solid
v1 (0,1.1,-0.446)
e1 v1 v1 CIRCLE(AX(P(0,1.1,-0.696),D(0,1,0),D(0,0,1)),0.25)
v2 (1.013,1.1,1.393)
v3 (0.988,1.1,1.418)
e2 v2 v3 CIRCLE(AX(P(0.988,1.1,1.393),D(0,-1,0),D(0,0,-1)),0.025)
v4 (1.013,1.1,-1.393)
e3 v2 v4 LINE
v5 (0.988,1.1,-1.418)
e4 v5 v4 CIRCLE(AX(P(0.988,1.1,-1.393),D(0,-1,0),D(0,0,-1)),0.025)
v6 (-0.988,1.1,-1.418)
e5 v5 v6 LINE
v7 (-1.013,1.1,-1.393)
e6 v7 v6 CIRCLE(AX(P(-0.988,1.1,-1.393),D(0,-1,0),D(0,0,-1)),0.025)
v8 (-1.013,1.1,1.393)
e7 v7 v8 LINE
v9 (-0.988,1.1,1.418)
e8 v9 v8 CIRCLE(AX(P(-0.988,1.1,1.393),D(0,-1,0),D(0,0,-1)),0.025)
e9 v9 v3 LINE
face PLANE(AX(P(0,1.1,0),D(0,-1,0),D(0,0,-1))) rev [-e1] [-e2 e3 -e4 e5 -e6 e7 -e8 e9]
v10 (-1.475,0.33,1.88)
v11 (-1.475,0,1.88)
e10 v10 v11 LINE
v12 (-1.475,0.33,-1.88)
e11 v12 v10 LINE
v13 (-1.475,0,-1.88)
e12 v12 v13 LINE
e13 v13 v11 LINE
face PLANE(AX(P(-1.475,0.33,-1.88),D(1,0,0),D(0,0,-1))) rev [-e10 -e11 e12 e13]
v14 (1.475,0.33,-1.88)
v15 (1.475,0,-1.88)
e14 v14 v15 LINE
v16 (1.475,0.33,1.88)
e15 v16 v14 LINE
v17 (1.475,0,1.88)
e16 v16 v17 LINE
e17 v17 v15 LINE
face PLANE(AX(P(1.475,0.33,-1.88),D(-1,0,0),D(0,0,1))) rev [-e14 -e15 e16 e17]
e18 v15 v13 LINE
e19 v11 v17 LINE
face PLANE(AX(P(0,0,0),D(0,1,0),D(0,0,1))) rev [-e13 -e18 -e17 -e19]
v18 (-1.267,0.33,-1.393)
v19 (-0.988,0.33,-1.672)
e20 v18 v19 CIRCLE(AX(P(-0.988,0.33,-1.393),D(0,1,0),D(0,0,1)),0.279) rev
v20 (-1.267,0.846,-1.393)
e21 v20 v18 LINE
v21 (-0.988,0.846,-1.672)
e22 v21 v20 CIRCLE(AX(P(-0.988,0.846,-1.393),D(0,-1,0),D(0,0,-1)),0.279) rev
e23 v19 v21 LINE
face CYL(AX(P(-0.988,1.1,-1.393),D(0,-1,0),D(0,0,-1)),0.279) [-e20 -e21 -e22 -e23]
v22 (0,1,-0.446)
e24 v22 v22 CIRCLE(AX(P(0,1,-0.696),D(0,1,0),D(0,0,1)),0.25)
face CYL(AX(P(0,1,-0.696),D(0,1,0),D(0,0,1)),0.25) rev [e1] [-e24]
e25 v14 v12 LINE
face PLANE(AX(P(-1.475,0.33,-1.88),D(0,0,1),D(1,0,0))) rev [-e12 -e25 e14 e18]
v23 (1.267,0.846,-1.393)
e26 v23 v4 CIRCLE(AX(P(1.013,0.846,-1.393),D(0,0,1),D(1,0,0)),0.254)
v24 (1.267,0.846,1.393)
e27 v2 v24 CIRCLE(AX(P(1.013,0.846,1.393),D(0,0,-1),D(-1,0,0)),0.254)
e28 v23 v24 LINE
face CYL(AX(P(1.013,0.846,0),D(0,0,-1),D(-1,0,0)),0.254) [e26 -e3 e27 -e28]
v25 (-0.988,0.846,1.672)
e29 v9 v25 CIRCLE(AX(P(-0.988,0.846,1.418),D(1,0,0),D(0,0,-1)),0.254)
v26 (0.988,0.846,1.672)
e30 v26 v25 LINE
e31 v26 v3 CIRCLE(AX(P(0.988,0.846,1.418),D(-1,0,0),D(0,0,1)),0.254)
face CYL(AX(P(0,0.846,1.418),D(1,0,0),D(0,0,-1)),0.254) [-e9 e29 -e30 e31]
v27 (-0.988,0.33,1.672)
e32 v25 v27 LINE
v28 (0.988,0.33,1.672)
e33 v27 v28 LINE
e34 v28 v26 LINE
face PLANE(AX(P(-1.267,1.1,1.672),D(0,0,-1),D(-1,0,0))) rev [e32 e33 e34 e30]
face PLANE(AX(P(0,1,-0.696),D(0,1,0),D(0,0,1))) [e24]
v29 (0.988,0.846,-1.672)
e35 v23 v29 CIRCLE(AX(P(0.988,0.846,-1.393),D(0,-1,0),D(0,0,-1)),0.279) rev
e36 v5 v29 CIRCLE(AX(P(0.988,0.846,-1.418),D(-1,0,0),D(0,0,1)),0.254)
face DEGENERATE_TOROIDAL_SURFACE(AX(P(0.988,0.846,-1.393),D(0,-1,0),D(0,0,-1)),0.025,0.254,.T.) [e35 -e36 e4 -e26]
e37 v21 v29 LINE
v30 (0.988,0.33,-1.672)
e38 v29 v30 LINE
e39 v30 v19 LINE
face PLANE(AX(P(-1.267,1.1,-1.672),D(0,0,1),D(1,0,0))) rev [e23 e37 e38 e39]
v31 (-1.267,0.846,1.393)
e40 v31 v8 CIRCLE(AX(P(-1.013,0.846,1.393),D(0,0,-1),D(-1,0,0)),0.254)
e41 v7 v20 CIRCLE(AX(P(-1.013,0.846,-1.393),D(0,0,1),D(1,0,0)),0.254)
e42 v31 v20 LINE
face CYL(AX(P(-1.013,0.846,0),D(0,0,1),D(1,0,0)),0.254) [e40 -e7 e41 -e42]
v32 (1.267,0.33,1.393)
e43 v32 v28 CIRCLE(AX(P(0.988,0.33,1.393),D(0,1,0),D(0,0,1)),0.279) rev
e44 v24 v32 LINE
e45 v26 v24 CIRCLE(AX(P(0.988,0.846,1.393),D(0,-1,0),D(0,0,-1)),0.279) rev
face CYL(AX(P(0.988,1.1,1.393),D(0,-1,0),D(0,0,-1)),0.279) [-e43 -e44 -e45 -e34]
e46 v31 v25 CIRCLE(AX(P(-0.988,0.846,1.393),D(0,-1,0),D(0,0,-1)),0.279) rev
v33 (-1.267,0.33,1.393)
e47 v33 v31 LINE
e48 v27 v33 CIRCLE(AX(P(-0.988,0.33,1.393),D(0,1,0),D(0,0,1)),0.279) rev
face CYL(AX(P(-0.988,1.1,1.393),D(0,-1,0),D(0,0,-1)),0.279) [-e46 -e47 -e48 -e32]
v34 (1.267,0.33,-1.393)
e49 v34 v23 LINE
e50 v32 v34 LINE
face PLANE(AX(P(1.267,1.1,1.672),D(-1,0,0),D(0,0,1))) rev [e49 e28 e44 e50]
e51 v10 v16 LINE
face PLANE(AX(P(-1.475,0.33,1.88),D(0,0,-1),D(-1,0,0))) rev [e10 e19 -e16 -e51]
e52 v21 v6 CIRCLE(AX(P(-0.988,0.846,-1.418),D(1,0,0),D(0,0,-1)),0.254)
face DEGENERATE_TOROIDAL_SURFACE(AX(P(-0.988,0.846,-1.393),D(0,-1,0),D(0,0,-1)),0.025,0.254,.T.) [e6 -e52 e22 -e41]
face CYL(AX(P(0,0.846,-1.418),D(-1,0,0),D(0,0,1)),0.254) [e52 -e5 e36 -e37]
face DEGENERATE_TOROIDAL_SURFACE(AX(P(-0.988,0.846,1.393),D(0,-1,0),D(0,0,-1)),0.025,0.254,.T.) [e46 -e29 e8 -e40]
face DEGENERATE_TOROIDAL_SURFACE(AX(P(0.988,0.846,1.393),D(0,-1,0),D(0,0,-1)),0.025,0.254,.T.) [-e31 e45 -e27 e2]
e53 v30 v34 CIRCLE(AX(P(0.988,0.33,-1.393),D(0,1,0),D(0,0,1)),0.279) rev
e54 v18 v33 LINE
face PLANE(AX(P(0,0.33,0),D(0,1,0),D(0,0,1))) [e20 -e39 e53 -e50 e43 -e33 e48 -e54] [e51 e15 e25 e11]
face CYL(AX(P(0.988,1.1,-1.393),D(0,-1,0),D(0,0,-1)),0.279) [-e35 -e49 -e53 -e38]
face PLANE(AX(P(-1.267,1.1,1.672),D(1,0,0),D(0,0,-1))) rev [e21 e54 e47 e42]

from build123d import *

# Parameters (mm, degrees)
SKETCH1_W           = 2.95
SKETCH1_H           = 3.76
BOSS_EXTRUDE1_DEPTH = 0.33
SKETCH2_W           = 2.534
SKETCH2_H           = 3.344
BOSS_EXTRUDE2_DEPTH = 0.77
FILLET1_R           = 0.254
FILLET2_R           = 0.279
SKETCH3_R           = 0.25
CUT_EXTRUDE1_DEPTH  = 0.1


with BuildPart() as part:
    # Sketch1 → Boss-Extrude1 (new body)
    with BuildSketch(Plane(origin=(0, 0, 0), x_dir=(1, 0, 0), z_dir=(0, 1, 0))):
        Rectangle(SKETCH1_W, SKETCH1_H)
    extrude(amount=BOSS_EXTRUDE1_DEPTH)

    # Sketch2 → Boss-Extrude2 (add)
    with BuildSketch(Plane(origin=(0, 0.33, 0), x_dir=(1, 0, 0), z_dir=(0, 1, 0))):
        Rectangle(SKETCH2_W, SKETCH2_H)
    extrude(amount=BOSS_EXTRUDE2_DEPTH)

    # Fillet1
    fillet1_edges = [part.edges().sort_by_distance(p)[0] for p in [
        (1.267, 1.1, 0),
        (0, 1.1, -1.672),
        (-1.267, 1.1, 0),
        (0, 1.1, 1.672),
    ]]
    fillet(fillet1_edges, radius=FILLET1_R)

    # Fillet2
    # the kernel refuses this fillet: 0.279 mm, written as the material it takes off along each edge
    with BuildSketch(Plane(origin=(-0.988, 1.1, -1.393), x_dir=(0, 0, -1), z_dir=(1, 0, 0))) as fillet2_piece_1:
        with BuildLine():
            CenterArc((0.025, -0.254), 0.254, 0, 90)
            Line((0.279, -0.254), (0.279, 0))
            Line((0.279, 0), (0.025, 0))
        make_face()
    revolve(axis=Axis((-0.988, 1.1, -1.393), (0, 1, 0)), revolution_arc=90, mode=Mode.SUBTRACT)
    with BuildSketch(Plane(origin=(0.988, 1.1, -1.393), x_dir=(1, 0, 0), z_dir=(0, 0, 1))) as fillet2_piece_2:
        with BuildLine():
            CenterArc((0.025, -0.254), 0.254, 0, 90)
            Line((0.279, -0.254), (0.279, 0))
            Line((0.279, 0), (0.025, 0))
        make_face()
    revolve(axis=Axis((0.988, 1.1, -1.393), (0, 1, 0)), revolution_arc=90, mode=Mode.SUBTRACT)
    with BuildSketch(Plane(origin=(-0.988, 1.1, 1.393), x_dir=(-1, 0, 0), z_dir=(0, 0, -1))) as fillet2_piece_3:
        with BuildLine():
            CenterArc((0.025, -0.254), 0.254, 0, 90)
            Line((0.279, -0.254), (0.279, 0))
            Line((0.279, 0), (0.025, 0))
        make_face()
    revolve(axis=Axis((-0.988, 1.1, 1.393), (0, 1, 0)), revolution_arc=90, mode=Mode.SUBTRACT)
    with BuildSketch(Plane(origin=(0.988, 1.1, 1.393), x_dir=(0, 0, 1), z_dir=(-1, 0, 0))) as fillet2_piece_4:
        with BuildLine():
            CenterArc((0.025, -0.254), 0.254, 0, 90)
            Line((0.279, -0.254), (0.279, 0))
            Line((0.279, 0), (0.025, 0))
        make_face()
    revolve(axis=Axis((0.988, 1.1, 1.393), (0, 1, 0)), revolution_arc=90, mode=Mode.SUBTRACT)
    with BuildSketch(Plane(origin=(1.267, 0.33, 1.672), x_dir=(-1, 0, 0), z_dir=(0, 1, 0)), Plane(origin=(-1.267, 0.33, 1.672), x_dir=(0, 0, -1), z_dir=(0, 1, 0))) as fillet2_piece_5:
        with BuildLine():
            CenterArc((FILLET2_R, -FILLET2_R), FILLET2_R, 90, 90)
            Line((0, -FILLET2_R), (0, 0))
            Line((0, 0), (FILLET2_R, 0))
        make_face()
    extrude(amount=0.77, mode=Mode.SUBTRACT)
    with BuildSketch(Plane(origin=(-1.267, 0.33, -1.672), x_dir=(0, 0, 1), z_dir=(0, 1, 0)), Plane(origin=(1.267, 0.33, -1.672), x_dir=(-1, 0, 0), z_dir=(0, 1, 0))) as fillet2_piece_6:
        with BuildLine():
            CenterArc((FILLET2_R, FILLET2_R), FILLET2_R, 180, 90)
            Line((0, FILLET2_R), (0, 0))
            Line((0, 0), (FILLET2_R, 0))
        make_face()
    extrude(amount=0.77, mode=Mode.SUBTRACT)

    # Sketch3 → Cut-Extrude1 (cut)
    with BuildSketch(Plane(origin=(0, 1.1, 0), x_dir=(1, 0, 0), z_dir=(0, 1, 0))):
        with Locations(Location((0, 0.696, 0), (0, 0, 270))):
            Circle(SKETCH3_R)
    extrude(amount=-CUT_EXTRUDE1_DEPTH, mode=Mode.SUBTRACT)


solid = part.part
